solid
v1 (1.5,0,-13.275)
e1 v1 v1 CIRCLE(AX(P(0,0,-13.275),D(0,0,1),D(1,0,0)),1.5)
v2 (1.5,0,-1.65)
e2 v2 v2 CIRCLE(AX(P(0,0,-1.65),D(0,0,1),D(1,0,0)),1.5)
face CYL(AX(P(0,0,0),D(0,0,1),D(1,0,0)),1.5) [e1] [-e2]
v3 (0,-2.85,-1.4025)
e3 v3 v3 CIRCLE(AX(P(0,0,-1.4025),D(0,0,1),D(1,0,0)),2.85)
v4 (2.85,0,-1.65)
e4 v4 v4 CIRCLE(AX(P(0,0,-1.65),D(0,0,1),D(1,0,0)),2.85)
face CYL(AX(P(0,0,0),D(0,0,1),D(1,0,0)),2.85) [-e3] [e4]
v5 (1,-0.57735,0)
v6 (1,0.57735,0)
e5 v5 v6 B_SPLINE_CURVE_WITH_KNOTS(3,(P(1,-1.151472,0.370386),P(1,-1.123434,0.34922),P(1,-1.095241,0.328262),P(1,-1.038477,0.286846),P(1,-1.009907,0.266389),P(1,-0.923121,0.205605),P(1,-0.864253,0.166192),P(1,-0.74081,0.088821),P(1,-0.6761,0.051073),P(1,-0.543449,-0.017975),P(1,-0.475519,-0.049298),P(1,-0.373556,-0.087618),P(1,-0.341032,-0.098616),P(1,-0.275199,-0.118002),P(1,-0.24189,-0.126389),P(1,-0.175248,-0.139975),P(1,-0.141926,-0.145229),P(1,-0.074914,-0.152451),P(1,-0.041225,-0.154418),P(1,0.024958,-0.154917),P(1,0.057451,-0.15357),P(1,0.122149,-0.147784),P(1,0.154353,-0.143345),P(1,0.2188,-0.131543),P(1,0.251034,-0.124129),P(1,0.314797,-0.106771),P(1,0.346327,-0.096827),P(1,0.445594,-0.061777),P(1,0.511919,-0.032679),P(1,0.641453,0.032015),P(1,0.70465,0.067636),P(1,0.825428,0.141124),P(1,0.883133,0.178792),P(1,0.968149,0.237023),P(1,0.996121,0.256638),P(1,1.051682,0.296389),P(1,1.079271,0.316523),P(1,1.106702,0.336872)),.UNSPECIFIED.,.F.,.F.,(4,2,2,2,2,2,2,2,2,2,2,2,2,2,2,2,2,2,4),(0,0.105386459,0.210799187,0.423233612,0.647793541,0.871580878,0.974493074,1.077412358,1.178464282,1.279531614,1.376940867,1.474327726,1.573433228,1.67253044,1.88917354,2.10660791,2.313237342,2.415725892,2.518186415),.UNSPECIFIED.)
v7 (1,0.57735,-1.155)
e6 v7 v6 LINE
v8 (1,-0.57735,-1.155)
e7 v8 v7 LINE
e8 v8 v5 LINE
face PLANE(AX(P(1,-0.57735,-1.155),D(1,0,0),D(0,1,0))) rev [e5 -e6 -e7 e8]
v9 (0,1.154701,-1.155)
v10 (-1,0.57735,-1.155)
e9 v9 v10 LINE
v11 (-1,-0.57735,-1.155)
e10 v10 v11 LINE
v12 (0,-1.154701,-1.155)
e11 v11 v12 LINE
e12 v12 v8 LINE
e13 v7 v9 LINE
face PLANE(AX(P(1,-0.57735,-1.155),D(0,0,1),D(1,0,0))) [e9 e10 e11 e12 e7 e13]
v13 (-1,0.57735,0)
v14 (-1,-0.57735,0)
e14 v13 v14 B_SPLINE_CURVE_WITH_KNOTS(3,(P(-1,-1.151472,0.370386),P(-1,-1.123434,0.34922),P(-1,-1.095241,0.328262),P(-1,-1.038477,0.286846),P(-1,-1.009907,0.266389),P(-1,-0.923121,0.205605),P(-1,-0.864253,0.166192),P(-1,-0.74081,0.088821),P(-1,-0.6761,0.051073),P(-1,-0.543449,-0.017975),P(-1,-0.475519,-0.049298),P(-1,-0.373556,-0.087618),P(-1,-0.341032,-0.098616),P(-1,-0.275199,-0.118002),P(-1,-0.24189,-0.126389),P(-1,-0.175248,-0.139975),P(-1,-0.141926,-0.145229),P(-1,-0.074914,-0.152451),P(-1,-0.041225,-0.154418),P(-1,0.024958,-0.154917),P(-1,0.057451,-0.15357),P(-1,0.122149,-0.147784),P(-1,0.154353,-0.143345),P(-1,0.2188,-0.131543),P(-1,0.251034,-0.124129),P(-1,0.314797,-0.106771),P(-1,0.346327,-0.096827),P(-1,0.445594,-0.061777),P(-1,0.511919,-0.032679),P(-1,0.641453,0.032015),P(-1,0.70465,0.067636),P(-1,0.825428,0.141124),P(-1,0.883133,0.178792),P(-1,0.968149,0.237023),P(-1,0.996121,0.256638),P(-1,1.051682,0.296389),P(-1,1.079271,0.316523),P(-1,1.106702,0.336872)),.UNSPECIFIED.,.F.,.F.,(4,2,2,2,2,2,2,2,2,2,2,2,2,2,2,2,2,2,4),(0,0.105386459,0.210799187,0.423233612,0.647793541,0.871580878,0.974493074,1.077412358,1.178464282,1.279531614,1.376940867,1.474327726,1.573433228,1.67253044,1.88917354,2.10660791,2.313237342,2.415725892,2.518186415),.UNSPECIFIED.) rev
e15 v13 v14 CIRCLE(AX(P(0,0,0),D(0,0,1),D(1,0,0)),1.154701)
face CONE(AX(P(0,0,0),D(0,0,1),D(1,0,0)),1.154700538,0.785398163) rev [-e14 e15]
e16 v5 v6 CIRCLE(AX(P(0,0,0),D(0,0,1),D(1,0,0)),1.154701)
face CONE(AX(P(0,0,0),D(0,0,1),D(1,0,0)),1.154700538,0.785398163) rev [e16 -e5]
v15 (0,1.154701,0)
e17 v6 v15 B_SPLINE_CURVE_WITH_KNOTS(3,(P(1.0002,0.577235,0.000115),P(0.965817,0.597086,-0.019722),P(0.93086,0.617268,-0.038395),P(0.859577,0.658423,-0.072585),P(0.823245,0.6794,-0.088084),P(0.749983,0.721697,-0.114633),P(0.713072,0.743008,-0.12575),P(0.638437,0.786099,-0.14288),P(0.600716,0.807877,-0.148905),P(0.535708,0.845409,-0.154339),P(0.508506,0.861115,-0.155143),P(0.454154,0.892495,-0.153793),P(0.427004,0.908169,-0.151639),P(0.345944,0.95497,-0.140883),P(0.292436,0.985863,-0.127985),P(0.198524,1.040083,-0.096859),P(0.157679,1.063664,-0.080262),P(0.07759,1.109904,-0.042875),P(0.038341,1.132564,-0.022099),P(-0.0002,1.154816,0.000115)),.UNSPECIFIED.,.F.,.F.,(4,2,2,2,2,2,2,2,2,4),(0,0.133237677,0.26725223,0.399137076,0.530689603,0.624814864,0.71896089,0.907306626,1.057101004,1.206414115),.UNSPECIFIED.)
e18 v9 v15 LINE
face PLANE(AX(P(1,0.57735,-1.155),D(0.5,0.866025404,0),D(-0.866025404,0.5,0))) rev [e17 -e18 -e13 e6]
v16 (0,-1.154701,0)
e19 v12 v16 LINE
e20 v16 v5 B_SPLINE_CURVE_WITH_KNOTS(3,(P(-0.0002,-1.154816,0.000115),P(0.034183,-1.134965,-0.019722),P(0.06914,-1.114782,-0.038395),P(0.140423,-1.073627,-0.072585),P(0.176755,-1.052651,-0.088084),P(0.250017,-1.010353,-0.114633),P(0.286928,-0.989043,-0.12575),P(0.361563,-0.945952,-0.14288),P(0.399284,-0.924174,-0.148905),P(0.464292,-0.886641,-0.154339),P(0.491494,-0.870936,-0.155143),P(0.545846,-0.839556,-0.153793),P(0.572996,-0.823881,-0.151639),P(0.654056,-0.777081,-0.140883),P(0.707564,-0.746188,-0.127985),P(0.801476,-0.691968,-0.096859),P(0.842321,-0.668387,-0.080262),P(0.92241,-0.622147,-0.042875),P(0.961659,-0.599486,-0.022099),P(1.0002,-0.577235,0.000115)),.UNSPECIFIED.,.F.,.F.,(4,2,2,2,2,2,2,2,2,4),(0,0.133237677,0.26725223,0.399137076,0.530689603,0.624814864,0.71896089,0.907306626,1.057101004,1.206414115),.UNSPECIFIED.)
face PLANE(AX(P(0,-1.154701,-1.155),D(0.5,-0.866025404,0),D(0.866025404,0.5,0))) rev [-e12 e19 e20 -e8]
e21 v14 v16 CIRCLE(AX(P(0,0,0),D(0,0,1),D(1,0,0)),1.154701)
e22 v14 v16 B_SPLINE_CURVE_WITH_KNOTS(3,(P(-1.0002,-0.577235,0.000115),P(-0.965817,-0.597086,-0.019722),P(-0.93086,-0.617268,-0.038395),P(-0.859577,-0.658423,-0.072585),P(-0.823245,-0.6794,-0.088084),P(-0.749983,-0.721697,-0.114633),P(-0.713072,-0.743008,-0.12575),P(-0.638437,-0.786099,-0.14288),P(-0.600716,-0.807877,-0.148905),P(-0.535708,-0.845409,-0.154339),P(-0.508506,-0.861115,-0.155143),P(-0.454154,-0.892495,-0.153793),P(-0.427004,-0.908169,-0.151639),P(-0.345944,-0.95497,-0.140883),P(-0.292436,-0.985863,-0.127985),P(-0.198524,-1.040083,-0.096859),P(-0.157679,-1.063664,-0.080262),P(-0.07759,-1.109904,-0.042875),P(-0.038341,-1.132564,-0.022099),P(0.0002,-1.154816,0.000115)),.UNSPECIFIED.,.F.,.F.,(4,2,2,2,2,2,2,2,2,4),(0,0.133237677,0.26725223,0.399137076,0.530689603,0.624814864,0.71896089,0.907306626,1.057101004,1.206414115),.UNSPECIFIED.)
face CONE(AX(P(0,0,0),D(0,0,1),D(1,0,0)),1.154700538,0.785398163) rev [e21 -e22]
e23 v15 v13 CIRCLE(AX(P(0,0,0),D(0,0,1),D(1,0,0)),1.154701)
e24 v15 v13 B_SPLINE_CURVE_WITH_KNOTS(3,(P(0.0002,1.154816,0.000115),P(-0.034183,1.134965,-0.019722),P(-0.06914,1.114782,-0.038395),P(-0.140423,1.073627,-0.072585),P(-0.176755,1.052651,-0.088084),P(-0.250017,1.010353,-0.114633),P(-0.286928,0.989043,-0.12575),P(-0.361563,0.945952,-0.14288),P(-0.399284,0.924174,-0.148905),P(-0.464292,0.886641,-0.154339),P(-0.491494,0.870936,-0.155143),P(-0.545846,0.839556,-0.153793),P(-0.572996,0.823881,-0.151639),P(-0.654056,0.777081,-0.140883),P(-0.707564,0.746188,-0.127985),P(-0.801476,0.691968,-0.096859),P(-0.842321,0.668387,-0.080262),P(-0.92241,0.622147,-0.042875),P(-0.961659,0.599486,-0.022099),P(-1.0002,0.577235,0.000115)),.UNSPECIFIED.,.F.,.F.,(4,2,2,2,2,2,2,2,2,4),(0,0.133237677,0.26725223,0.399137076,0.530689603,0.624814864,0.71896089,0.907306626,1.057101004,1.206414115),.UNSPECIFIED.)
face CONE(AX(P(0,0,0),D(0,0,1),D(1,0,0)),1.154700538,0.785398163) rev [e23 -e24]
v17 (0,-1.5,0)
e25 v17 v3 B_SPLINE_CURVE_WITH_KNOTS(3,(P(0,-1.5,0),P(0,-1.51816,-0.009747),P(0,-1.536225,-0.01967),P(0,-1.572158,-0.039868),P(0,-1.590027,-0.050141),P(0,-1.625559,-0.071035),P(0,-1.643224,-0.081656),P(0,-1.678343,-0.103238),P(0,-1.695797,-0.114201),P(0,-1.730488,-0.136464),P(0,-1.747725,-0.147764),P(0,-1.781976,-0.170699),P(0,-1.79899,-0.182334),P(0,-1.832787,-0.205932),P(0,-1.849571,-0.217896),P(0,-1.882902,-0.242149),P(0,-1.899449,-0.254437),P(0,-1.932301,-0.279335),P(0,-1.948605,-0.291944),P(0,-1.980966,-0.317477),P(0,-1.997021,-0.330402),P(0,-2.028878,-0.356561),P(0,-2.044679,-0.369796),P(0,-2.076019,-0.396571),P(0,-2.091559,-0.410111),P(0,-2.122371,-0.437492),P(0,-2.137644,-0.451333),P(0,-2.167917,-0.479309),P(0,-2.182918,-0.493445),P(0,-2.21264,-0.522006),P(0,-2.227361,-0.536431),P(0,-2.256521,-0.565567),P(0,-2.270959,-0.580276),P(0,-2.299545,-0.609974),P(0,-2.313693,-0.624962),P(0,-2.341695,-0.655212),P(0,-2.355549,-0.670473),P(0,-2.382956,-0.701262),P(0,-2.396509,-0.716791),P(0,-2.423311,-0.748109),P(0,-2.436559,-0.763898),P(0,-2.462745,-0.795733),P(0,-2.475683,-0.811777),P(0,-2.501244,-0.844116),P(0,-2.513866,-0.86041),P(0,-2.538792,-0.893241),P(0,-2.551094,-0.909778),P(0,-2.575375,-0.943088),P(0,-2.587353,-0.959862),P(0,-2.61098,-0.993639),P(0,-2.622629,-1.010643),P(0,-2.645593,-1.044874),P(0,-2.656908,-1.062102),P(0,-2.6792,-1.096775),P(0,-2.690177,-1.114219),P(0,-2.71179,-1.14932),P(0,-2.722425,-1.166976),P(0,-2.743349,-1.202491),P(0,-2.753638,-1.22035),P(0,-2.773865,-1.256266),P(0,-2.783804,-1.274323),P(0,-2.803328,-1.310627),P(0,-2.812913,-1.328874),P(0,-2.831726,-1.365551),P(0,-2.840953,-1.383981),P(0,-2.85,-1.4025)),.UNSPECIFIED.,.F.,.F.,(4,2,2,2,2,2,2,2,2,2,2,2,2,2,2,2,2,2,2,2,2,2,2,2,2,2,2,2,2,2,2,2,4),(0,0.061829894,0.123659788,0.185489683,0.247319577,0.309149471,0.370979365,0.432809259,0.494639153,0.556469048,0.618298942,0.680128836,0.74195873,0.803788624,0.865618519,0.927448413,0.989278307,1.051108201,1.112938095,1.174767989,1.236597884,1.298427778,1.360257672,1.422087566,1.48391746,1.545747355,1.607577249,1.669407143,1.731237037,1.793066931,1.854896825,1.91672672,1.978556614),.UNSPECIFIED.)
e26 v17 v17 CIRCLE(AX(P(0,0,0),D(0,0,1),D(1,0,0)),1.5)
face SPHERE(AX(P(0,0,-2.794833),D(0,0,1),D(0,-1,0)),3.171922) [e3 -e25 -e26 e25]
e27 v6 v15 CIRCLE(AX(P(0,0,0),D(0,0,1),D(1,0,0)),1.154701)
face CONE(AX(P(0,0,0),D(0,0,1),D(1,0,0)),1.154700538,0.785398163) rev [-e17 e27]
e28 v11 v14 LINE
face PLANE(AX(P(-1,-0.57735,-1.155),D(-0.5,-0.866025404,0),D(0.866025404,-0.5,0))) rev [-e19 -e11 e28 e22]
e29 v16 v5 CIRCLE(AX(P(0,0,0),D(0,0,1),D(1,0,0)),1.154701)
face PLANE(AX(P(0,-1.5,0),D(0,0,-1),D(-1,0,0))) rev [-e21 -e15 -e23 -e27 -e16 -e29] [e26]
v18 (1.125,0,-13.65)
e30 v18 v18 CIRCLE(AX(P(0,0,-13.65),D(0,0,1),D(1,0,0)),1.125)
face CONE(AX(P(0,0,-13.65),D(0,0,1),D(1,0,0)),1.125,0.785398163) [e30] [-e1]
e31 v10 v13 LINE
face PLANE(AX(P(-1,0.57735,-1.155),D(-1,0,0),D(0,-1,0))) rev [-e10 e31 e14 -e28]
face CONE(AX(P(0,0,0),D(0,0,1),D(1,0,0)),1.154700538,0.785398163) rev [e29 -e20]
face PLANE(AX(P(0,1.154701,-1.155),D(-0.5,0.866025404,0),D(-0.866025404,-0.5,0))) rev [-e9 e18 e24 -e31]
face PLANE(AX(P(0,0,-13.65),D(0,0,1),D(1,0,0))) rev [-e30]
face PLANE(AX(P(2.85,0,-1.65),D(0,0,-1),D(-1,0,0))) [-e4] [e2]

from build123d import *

# Parameters (mm, degrees)
CUT_EXTRUDE2_DEPTH = 1.155


with BuildPart() as part:
    # Sketch10 → Revolve3 (revolve)
    with BuildSketch(Plane(origin=(0, 0, 0), x_dir=(0, 0, -1), z_dir=(1, 0, 0)), mode=Mode.PRIVATE) as revolve3_sk:
        Polygon((13.275, 1.5), (13.65, 1.125), (13.65, 0), (1.65, 0), (1.65, 1.5), align=None)
    revolve(revolve3_sk.sketch.rotate(Axis((0, 0, 0), (0, 0, -1)), 90), axis=Axis((0, 0, 0), (0, 0, -1)))

    # Sketch7 → Revolve2 (revolve)
    with BuildSketch(Plane(origin=(0, 0, 0), x_dir=(0, 0, -1), z_dir=(1, 0, 0)), mode=Mode.PRIVATE) as revolve2_sk:
        with BuildLine():
            Line((1.4025, 2.85), (1.65, 2.85))
            Line((1.65, 2.85), (1.65, 0))
            Line((1.65, 0), (0, 0))
            Line((0, 0), (0, 1.5))
            ThreePointArc((0, 1.5), (0.59512511, 2.285251969), (1.4025, 2.85))
        make_face()
    revolve(revolve2_sk.sketch.rotate(Axis((0, 0, 0), (0, 0, -1)), 180), axis=Axis((0, 0, 0), (0, 0, -1)))

    # Sketch5 → Cut-Extrude2 (cut)
    with BuildSketch(Plane.XY):
        Polygon((1, -0.577350269), (1, 0.577350269), (0, 1.154700538), (-1, 0.577350269), (-1, -0.577350269), (0, -1.154700538), align=None)
    extrude(amount=-CUT_EXTRUDE2_DEPTH, mode=Mode.SUBTRACT)

    # Cut-Extrude3 cone 1 section (through the dimple's axis) → Cut-Extrude3 (revolve, cut)
    with BuildSketch(Plane(origin=(0, 0, 0), x_dir=(0, -1, 0), z_dir=(1, 0, 0))):
        Polygon((0, 0), (1.154700538, 0), (0, 1.154700538), align=None)
    revolve(axis=Axis((0, 0, 0), (0, 0, -1)), mode=Mode.SUBTRACT)


with BuildPart() as body_2:
    # Split1: read off the stored shape, not the designer's step
    # Split1: the piece on the far side of the plane
    add(part.part)
    split(bisect_by=Plane.XY.offset(-1.65), keep=Keep.BOTTOM)


with BuildPart() as part_1:
    add(part.part)

    # Split1
    split(bisect_by=Plane.XY.offset(-1.65), keep=Keep.TOP)


with BuildPart() as body_2_1:
    add(body_2.part)

    # Boss-Extrude1: read off the stored shape, not the designer's step
    # Boss-Extrude1: union part
    add(part_1.part)


solid = body_2_1.part
